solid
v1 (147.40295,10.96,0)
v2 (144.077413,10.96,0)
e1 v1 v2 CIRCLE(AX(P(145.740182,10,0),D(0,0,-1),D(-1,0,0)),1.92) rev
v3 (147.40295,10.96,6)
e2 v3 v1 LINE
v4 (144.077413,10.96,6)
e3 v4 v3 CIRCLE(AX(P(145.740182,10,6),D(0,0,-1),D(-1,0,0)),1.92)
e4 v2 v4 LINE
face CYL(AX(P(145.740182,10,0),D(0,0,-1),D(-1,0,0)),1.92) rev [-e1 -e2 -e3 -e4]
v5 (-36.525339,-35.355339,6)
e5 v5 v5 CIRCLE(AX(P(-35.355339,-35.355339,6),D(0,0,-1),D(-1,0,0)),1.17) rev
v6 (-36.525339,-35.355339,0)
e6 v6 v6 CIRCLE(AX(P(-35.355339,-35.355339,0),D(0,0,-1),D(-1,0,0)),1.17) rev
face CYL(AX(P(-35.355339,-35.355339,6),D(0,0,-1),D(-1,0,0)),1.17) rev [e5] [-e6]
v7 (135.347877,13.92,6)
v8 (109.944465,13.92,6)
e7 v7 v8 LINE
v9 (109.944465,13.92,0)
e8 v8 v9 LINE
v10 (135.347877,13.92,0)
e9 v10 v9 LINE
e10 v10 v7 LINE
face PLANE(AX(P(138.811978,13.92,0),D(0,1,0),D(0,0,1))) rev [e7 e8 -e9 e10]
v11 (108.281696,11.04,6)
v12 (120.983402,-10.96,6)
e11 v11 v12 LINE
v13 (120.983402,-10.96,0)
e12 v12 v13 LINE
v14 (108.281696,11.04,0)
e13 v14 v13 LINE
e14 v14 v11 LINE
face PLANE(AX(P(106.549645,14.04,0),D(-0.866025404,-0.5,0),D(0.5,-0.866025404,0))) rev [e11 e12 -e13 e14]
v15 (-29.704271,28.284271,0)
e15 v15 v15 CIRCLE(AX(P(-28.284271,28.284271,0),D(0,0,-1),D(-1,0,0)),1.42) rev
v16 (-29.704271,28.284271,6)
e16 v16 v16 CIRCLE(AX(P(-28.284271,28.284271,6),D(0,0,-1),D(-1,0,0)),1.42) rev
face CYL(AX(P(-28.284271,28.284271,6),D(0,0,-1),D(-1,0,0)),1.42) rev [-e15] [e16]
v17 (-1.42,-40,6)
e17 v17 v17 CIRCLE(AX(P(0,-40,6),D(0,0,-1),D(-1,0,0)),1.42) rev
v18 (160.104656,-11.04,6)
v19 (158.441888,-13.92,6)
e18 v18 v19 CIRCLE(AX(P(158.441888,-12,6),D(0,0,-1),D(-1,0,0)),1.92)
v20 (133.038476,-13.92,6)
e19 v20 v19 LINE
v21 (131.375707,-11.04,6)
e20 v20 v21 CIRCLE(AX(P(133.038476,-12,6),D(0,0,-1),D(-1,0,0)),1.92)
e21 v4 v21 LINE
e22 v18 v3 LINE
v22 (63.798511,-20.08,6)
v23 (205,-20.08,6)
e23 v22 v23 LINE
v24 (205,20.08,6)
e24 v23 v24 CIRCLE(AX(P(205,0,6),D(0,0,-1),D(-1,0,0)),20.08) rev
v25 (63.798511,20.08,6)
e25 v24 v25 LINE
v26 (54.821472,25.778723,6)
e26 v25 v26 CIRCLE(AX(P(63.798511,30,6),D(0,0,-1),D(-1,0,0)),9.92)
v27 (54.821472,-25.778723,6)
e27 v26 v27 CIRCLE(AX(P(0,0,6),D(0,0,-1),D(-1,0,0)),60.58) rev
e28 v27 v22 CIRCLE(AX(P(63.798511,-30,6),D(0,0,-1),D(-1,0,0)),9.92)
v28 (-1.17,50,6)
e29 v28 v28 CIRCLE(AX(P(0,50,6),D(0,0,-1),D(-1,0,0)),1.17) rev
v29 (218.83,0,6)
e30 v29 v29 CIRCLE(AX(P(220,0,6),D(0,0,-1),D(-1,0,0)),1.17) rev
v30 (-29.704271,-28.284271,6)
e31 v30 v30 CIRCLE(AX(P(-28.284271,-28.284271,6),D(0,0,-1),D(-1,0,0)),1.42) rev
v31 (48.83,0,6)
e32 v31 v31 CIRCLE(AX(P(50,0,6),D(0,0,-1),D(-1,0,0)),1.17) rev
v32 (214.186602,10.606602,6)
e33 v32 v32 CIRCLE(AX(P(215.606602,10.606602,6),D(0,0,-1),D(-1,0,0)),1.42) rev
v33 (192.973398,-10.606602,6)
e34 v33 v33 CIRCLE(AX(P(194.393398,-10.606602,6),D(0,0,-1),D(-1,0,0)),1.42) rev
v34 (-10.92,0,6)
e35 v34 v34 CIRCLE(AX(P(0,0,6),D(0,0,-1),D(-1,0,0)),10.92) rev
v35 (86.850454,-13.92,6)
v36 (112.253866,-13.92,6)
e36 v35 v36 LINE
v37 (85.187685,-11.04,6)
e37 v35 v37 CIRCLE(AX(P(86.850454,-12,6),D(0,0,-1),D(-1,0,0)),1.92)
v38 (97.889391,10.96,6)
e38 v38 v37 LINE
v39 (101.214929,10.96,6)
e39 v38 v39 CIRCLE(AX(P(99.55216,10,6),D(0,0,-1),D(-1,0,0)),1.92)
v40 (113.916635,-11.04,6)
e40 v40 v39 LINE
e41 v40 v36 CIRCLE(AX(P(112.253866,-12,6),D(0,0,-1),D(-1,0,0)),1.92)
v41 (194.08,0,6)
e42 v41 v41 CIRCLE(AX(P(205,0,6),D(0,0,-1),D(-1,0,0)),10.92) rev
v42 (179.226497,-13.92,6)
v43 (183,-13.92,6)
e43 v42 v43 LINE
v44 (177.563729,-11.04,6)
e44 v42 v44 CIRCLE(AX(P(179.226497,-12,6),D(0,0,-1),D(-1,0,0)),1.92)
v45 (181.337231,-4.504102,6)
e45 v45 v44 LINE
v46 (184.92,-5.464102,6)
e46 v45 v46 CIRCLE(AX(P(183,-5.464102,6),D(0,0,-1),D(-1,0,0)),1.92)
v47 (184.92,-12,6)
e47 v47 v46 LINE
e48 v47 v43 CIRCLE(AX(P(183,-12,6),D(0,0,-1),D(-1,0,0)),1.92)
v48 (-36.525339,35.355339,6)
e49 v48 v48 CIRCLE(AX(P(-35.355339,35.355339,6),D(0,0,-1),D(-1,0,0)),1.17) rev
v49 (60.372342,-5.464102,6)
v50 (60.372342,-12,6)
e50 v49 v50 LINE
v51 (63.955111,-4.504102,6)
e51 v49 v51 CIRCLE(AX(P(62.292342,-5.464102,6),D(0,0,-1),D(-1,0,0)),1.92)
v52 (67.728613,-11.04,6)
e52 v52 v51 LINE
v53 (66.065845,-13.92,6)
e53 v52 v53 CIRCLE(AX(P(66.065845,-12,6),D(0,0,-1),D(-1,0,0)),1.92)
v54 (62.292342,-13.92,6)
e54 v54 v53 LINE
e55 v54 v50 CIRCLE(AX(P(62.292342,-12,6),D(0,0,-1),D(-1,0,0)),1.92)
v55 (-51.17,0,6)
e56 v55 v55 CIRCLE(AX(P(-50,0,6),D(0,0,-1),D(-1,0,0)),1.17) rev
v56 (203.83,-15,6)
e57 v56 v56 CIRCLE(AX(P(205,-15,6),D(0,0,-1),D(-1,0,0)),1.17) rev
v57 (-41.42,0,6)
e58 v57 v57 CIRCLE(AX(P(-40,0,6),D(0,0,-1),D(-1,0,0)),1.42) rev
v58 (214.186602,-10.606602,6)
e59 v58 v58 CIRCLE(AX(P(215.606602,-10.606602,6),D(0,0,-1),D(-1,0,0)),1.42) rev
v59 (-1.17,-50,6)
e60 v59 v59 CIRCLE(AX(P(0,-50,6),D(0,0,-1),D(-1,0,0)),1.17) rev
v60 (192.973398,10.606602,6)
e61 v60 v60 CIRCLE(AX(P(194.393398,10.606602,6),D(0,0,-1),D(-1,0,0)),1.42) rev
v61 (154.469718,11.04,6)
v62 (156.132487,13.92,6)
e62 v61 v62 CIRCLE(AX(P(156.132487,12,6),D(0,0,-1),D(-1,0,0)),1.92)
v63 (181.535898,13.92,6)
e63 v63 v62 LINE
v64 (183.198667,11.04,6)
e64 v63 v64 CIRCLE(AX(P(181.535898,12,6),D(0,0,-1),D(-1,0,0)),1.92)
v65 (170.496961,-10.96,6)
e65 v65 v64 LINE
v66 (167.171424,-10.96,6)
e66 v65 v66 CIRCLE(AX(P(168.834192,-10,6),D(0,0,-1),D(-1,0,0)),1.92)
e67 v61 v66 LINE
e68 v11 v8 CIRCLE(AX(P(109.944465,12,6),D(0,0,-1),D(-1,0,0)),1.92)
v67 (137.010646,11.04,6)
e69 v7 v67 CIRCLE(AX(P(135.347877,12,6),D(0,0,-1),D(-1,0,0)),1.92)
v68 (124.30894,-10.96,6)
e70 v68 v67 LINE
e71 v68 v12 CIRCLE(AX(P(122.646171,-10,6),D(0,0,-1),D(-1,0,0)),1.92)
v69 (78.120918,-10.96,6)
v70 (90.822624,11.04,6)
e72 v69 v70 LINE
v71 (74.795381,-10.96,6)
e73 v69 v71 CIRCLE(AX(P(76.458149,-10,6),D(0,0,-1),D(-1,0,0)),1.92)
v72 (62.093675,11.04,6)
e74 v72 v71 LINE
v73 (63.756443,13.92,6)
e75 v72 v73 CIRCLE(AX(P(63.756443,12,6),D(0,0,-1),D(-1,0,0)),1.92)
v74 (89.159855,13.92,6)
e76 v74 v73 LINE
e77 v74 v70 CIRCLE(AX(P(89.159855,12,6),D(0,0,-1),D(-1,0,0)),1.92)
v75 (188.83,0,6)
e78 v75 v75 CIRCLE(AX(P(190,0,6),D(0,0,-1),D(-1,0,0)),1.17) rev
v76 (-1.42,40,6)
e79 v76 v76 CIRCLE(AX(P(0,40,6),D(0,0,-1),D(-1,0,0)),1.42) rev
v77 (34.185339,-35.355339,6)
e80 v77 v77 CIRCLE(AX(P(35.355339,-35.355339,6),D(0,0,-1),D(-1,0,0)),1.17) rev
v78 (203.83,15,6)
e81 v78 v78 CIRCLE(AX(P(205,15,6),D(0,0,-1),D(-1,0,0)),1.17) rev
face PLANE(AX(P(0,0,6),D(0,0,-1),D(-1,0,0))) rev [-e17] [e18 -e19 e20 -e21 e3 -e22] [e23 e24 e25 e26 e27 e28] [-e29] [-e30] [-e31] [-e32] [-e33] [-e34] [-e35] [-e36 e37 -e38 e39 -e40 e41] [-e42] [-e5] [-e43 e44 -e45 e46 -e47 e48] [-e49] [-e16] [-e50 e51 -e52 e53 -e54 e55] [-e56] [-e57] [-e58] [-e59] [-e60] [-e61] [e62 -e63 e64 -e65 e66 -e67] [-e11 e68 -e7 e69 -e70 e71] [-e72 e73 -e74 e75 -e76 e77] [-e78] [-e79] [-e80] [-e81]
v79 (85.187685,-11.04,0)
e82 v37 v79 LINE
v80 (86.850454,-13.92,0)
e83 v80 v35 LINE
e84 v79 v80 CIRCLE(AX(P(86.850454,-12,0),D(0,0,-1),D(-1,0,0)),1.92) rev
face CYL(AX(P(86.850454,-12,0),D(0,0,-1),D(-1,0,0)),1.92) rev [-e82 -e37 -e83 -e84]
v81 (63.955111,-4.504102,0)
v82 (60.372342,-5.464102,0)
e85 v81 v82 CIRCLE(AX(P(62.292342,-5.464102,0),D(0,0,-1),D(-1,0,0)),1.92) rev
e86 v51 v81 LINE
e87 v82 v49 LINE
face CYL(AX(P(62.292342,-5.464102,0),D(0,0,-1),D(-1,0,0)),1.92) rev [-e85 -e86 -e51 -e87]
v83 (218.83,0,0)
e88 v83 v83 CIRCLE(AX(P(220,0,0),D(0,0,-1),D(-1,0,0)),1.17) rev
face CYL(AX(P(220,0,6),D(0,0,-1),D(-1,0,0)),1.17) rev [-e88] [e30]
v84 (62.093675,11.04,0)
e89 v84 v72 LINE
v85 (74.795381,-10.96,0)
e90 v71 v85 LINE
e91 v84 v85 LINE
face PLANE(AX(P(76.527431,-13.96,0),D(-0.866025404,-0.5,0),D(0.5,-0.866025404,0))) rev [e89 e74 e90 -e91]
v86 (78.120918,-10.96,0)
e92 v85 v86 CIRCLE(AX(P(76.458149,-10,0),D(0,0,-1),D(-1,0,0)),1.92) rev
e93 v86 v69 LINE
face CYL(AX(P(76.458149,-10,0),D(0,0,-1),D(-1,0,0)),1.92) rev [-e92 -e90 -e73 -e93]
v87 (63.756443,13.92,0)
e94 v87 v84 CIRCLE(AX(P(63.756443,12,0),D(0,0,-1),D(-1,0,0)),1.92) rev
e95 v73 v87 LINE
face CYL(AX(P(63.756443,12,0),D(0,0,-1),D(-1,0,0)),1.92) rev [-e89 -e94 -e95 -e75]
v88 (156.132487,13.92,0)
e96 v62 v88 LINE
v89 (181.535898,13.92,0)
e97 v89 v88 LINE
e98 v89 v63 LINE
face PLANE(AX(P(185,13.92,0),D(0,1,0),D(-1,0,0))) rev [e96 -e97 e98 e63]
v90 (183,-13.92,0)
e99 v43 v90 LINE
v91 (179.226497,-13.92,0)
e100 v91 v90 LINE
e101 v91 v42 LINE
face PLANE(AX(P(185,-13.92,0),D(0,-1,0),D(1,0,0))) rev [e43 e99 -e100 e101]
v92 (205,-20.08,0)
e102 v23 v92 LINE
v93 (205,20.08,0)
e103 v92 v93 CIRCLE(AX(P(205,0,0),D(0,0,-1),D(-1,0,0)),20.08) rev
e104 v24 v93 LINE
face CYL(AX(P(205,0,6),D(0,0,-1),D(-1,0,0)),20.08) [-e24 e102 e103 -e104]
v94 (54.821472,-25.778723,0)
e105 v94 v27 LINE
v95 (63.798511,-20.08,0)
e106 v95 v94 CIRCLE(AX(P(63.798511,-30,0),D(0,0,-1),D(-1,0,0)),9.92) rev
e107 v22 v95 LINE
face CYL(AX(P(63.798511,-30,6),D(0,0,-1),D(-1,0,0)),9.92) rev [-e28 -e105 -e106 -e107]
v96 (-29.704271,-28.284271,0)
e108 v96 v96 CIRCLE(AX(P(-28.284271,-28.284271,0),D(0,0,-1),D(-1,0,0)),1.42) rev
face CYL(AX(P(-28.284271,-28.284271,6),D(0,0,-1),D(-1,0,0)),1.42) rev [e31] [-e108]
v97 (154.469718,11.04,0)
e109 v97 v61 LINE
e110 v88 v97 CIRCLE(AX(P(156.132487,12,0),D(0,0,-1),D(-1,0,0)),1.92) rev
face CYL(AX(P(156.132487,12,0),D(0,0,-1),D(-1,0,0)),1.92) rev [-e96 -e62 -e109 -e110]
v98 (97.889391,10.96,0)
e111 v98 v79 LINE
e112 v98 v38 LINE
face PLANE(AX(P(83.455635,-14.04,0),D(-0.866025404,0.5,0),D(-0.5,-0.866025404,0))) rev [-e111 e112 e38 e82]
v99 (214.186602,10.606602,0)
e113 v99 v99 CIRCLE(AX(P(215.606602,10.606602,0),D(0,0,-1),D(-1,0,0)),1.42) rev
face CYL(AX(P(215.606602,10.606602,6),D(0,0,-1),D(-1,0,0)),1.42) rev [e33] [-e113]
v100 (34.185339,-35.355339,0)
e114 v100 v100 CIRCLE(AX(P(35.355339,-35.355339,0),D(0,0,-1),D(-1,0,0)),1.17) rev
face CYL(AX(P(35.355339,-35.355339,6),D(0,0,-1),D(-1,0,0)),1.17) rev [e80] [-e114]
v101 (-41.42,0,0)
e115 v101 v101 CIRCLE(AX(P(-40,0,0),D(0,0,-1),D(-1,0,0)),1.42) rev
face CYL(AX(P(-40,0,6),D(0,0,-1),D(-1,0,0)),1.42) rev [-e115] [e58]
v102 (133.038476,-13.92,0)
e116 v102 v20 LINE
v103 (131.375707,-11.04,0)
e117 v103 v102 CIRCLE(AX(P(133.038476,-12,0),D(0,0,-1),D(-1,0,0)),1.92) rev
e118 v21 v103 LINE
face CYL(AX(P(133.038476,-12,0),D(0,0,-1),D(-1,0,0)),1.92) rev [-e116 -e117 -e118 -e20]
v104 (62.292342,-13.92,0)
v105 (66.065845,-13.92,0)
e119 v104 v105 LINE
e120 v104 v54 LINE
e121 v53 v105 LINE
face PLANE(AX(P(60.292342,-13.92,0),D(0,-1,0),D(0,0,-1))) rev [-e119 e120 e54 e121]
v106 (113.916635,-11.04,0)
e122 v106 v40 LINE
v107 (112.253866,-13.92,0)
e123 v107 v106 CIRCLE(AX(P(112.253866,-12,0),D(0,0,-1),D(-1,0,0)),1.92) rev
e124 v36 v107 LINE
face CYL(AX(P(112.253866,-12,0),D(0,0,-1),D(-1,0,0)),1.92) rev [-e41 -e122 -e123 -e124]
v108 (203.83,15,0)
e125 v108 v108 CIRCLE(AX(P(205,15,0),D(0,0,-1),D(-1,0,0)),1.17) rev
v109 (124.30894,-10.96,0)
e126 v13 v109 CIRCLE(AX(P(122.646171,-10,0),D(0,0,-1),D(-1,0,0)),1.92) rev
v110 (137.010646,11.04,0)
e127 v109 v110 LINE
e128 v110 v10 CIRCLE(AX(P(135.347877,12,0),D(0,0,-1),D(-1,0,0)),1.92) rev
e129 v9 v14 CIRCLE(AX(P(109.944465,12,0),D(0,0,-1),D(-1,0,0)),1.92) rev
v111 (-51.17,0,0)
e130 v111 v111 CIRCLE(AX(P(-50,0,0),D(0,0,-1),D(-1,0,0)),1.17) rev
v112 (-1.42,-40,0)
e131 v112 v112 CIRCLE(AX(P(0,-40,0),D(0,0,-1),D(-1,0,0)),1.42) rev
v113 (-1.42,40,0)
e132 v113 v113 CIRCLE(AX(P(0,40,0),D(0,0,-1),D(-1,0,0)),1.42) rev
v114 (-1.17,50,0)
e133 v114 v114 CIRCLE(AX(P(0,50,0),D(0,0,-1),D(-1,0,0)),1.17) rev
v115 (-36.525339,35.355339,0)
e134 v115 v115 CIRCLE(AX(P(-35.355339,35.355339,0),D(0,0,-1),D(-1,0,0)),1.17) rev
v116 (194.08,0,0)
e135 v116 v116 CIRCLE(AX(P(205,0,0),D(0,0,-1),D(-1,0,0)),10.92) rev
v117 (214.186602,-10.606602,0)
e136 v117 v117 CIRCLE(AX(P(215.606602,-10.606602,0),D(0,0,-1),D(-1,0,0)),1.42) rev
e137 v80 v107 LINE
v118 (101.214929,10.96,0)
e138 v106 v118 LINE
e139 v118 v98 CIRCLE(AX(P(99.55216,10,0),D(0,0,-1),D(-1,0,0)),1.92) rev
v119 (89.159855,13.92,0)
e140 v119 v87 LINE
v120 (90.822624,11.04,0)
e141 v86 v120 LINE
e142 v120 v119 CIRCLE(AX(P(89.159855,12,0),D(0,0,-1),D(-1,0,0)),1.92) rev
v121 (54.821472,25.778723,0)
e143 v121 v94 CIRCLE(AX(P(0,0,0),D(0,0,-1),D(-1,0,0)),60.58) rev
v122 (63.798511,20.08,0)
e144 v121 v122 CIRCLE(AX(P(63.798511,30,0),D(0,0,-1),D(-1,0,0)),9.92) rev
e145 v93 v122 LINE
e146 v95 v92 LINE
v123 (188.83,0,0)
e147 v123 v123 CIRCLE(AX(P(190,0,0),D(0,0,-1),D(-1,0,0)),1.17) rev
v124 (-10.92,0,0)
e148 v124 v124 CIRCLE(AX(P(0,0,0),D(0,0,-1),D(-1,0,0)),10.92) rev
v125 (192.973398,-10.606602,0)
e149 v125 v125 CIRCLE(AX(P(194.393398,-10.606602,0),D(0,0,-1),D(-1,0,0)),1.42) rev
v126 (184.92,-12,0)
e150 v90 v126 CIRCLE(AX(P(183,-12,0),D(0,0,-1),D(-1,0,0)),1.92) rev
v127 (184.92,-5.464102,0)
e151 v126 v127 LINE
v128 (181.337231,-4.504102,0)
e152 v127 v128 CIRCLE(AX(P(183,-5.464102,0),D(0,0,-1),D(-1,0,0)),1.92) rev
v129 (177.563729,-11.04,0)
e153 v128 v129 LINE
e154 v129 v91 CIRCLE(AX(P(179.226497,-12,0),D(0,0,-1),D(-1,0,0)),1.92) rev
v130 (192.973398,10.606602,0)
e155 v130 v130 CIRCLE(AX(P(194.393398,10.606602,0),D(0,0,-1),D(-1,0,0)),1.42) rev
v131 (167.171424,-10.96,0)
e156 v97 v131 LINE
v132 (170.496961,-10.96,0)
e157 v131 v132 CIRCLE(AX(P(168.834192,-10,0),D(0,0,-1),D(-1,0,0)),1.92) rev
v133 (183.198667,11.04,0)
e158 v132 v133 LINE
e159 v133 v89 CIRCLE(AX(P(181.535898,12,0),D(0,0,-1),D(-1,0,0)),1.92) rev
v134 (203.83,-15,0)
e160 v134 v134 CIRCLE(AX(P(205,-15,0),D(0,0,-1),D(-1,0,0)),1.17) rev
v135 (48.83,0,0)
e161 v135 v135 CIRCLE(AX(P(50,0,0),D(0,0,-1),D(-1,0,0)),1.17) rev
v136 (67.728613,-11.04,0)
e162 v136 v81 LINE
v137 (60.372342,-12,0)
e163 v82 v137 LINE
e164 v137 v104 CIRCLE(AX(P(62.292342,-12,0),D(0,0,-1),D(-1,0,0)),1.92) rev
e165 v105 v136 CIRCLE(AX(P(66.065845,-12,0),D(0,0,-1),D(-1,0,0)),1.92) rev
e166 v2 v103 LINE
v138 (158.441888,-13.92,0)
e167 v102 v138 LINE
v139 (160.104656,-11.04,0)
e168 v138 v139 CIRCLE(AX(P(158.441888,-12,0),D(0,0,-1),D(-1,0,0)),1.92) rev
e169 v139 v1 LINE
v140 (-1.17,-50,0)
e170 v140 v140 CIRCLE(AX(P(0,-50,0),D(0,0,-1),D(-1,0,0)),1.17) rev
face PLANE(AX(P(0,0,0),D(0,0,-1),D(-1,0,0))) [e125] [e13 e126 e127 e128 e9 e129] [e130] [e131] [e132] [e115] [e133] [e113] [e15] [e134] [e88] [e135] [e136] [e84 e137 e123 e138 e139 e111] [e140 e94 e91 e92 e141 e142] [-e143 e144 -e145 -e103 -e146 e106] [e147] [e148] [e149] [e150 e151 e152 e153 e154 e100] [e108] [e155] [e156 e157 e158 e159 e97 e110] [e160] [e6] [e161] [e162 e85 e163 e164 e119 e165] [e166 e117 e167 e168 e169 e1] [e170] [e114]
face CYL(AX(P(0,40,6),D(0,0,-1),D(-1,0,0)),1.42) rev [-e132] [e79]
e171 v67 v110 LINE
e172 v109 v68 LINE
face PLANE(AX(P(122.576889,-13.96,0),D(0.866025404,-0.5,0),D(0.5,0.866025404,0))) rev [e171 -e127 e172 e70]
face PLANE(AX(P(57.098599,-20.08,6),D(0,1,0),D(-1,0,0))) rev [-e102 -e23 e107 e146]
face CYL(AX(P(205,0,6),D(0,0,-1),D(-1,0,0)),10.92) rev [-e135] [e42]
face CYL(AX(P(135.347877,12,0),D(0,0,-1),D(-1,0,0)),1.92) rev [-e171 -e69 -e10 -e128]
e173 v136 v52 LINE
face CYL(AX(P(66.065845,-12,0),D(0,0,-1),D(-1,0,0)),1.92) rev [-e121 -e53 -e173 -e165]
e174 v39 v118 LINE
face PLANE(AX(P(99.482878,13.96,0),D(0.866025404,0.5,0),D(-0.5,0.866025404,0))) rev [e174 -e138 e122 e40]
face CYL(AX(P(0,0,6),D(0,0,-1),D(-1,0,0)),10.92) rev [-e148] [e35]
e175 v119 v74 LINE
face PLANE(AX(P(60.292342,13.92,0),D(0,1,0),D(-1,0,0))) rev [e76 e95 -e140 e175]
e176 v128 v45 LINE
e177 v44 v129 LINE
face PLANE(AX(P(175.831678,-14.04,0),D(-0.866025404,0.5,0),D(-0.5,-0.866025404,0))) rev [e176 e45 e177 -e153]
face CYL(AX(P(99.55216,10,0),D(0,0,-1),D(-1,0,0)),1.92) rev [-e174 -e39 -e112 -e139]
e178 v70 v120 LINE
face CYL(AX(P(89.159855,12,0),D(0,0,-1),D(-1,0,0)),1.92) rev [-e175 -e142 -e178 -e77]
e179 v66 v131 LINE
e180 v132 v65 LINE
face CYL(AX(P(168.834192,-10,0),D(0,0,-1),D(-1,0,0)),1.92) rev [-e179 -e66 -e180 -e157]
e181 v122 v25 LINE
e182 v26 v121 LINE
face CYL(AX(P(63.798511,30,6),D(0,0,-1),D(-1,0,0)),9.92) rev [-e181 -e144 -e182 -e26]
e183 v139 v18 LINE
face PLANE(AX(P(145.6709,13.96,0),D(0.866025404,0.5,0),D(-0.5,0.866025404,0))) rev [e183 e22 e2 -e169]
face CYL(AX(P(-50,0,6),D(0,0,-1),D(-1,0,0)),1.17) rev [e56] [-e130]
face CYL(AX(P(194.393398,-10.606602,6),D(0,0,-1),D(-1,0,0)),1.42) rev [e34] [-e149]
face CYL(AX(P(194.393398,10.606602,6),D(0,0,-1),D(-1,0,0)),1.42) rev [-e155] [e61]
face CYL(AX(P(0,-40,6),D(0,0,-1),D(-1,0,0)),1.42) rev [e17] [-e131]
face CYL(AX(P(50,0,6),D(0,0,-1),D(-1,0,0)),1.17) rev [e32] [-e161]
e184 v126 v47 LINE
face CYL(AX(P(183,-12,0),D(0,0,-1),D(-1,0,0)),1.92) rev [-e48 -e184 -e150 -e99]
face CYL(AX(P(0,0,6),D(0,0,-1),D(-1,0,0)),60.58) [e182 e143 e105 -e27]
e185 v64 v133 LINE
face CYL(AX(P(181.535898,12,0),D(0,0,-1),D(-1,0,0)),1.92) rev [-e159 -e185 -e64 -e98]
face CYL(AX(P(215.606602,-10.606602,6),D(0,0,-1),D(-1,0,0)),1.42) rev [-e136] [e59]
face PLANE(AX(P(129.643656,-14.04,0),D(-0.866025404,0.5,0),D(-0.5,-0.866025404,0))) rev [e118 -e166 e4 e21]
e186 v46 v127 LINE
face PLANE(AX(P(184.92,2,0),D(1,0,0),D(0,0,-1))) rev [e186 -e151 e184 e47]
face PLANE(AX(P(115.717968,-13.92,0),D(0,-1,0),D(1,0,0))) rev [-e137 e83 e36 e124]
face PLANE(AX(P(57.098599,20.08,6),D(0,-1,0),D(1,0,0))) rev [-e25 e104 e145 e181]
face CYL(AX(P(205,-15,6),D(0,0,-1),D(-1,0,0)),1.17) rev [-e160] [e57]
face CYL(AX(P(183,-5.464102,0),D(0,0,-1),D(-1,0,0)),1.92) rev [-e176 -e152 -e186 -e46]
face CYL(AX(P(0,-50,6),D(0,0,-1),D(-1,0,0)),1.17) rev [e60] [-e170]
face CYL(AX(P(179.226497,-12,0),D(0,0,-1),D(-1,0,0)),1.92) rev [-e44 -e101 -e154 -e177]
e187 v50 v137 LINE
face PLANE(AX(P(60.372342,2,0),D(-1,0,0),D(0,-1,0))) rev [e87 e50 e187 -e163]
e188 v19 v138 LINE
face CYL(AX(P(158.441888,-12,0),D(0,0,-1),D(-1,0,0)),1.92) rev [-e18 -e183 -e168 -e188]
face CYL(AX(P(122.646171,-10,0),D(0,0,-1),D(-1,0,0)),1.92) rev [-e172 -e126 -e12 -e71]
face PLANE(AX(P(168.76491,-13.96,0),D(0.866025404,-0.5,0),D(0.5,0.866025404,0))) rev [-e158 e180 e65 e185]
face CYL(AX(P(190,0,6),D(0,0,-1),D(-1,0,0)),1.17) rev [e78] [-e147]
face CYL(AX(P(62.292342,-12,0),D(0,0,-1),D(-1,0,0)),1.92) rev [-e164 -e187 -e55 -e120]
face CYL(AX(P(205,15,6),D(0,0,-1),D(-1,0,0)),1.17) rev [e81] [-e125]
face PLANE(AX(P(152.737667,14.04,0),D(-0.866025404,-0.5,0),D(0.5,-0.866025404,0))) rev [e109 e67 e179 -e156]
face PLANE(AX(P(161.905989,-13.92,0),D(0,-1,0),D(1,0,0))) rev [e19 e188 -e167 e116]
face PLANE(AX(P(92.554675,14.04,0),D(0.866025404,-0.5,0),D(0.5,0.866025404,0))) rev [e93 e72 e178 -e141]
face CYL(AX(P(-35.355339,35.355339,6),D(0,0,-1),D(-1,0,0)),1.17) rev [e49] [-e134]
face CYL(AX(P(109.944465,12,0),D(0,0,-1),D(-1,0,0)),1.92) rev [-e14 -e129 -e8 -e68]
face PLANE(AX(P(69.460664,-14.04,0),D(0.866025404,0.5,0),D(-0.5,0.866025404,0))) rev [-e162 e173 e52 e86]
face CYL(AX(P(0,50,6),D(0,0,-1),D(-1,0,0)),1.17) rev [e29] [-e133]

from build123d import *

# Parameters (mm, degrees)
SKETCH1_R              = 11
SKETCH1_R_2            = 1.25
SKETCH1_R_3            = 1.5
BOSS_EXTRUDE1_DEPTH    = 6
FILLET1_R              = 10
CUT_EXTRUDE1_DEPTH     = 234.069195734
FILLET2_R              = 2
MOVE_FACE1_OUTLINE_R   = 11
MOVE_FACE1_OUTLINE_R_2 = 10.92
MOVE_FACE1_OUTLINE_R_3 = 1.25
MOVE_FACE1_OUTLINE_R_4 = 1.17
MOVE_FACE1_OUTLINE_R_5 = 1.5
MOVE_FACE1_OUTLINE_R_6 = 1.42
MOVE_FACE1_DEPTH       = 6


# Read off the part's stored shape, not the designer's step: Move Face1
with BuildPart() as part:
    # Sketch1 → Boss-Extrude1 (new body)
    with BuildSketch(Plane.XY):
        with BuildLine():
            Line((57.098598932, -20), (205, -20))
            ThreePointArc((205, -20), (225, 0), (205, 20))
            Line((205, 20), (57.098598932, 20))
            ThreePointArc((57.098598932, 20), (-60.5, 0), (57.098598932, -20))
        make_face()
        Circle(SKETCH1_R, mode=Mode.SUBTRACT)
        with Locations((205, 0)):
            Circle(SKETCH1_R, mode=Mode.SUBTRACT)
        with Locations((205, -15)):
            Circle(SKETCH1_R_2, mode=Mode.SUBTRACT)
        with Locations((215.606601718, -10.606601718)):
            Circle(SKETCH1_R_3, mode=Mode.SUBTRACT)
        with Locations((190, 0)):
            Circle(SKETCH1_R_2, mode=Mode.SUBTRACT)
        with Locations((194.393398282, -10.606601718)):
            Circle(SKETCH1_R_3, mode=Mode.SUBTRACT)
        with Locations((205, 15)):
            Circle(SKETCH1_R_2, mode=Mode.SUBTRACT)
        with Locations((194.393398282, 10.606601718)):
            Circle(SKETCH1_R_3, mode=Mode.SUBTRACT)
        with Locations((220, 0)):
            Circle(SKETCH1_R_2, mode=Mode.SUBTRACT)
        with Locations((215.606601718, 10.606601718)):
            Circle(SKETCH1_R_3, mode=Mode.SUBTRACT)
        with Locations((0, -40)):
            Circle(SKETCH1_R_3, mode=Mode.SUBTRACT)
        with Locations((0, -50)):
            Circle(SKETCH1_R_2, mode=Mode.SUBTRACT)
        with Locations((-28.284271247, -28.284271247)):
            Circle(SKETCH1_R_3, mode=Mode.SUBTRACT)
        with Locations((-35.355339059, -35.355339059)):
            Circle(SKETCH1_R_2, mode=Mode.SUBTRACT)
        with Locations((-40, 0)):
            Circle(SKETCH1_R_3, mode=Mode.SUBTRACT)
        with Locations((-50, 0)):
            Circle(SKETCH1_R_2, mode=Mode.SUBTRACT)
        with Locations((-28.284271247, 28.284271247)):
            Circle(SKETCH1_R_3, mode=Mode.SUBTRACT)
        with Locations((-35.355339059, 35.355339059)):
            Circle(SKETCH1_R_2, mode=Mode.SUBTRACT)
        with Locations((0, 40)):
            Circle(SKETCH1_R_3, mode=Mode.SUBTRACT)
        with Locations((0, 50)):
            Circle(SKETCH1_R_2, mode=Mode.SUBTRACT)
        with Locations((50, 0)):
            Circle(SKETCH1_R_2, mode=Mode.SUBTRACT)
        with Locations((35.355339059, -35.355339059)):
            Circle(SKETCH1_R_2, mode=Mode.SUBTRACT)
    extrude(amount=BOSS_EXTRUDE1_DEPTH)

    # Fillet1
    fillet1_edges = [part.edges().sort_by_distance(p)[0] for p in [
        (57.098598932, 20, 3),
        (57.098598932, -20, 3),
    ]]
    fillet(fillet1_edges, radius=FILLET1_R)

    # Sketch2 → Cut-Extrude1 (cut, through all)
    with BuildSketch(Plane.XY.offset(6)):
        Polygon((60.292341855, 14), (92.62395693, 14), (76.458149392, -14), align=None)
        Polygon((83.386352623, -14), (99.55216016, 14), (115.717967697, -14), align=None)
        Polygon((106.48036339, 14), (122.646170928, -14), (138.811978465, 14), align=None)
        Polygon((129.574374158, -14), (145.740181695, 14), (161.905989232, -14), align=None)
        Polygon((152.668384925, 14), (168.834192463, -14), (185, 14), align=None)
        Polygon((60.292341855, 2), (60.292341855, -14), (69.529946162, -14), align=None)
        Polygon((185, 2), (185, -14), (175.762395693, -14), align=None)
    extrude(amount=-CUT_EXTRUDE1_DEPTH, mode=Mode.SUBTRACT)

    # Fillet2
    fillet2_edges = [part.edges().sort_by_distance(p)[0] for p in [
        (76.458149392, -14, 3),
        (60.292341855, 14, 3),
        (92.62395693, 14, 3),
        (115.717967697, -14, 3),
        (83.386352623, -14, 3),
        (99.55216016, 14, 3),
        (106.48036339, 14, 3),
        (138.811978465, 14, 3),
        (122.646170928, -14, 3),
        (161.905989232, -14, 3),
        (129.574374158, -14, 3),
        (145.740181695, 14, 3),
        (152.668384925, 14, 3),
        (185, 14, 3),
        (168.834192463, -14, 3),
        (60.292341855, 2, 3),
        (69.529946162, -14, 3),
        (60.292341855, -14, 3),
        (175.762395693, -14, 3),
        (185, 2, 3),
        (185, -14, 3),
    ]]
    fillet(fillet2_edges, radius=FILLET2_R)

    # Move Face1 outline → Move Face1 (add)
    # profile 1 of 30: a face of its own
    with BuildSketch(Plane.XY):
        with BuildLine():
            ThreePointArc((54.82147225, 25.778723404), (-60.58, 0), (54.82147225, -25.778723404))
            ThreePointArc((54.82147225, -25.778723404), (58.481964323, -21.624993617), (63.798510954, -20.08))
            Line((63.798510954, -20.08), (205, -20.08))
            ThreePointArc((205, -20.08), (225.08, 0), (205, 20.08))
            Line((205, 20.08), (63.798510954, 20.08))
            ThreePointArc((63.798510954, 20.08), (58.481964323, 21.624993617), (54.82147225, 25.778723404))
        make_face()
        with BuildLine():
            ThreePointArc((63.798510954, -20), (58.439088947, -21.557453243), (54.749076776, -25.744680851))
            ThreePointArc((54.749076776, -25.744680851), (-60.5, 0), (54.749076776, 25.744680851))
            ThreePointArc((54.749076776, 25.744680851), (58.439088947, 21.557453243), (63.798510954, 20))
            Line((63.798510954, 20), (205, 20))
            ThreePointArc((205, 20), (225, 0), (205, -20))
            Line((205, -20), (63.798510954, -20))
        make_face(mode=Mode.SUBTRACT)
    # profile 2 of 30: a face of its own
    with BuildSketch(Plane.XY):
        Circle(MOVE_FACE1_OUTLINE_R)
        Circle(MOVE_FACE1_OUTLINE_R_2, mode=Mode.SUBTRACT)
    # profile 3 of 30: a face of its own
    with BuildSketch(Plane.XY):
        with Locations((205, 0)):
            Circle(MOVE_FACE1_OUTLINE_R)
        with Locations((205, 0)):
            Circle(MOVE_FACE1_OUTLINE_R_2, mode=Mode.SUBTRACT)
    # profile 4 of 30: a face of its own
    with BuildSketch(Plane.XY):
        with Locations((205, -15)):
            Circle(MOVE_FACE1_OUTLINE_R_3)
        with Locations((205, -15)):
            Circle(MOVE_FACE1_OUTLINE_R_4, mode=Mode.SUBTRACT)
    # profile 5 of 30: a face of its own
    with BuildSketch(Plane.XY):
        with Locations((215.606601718, -10.606601718)):
            Circle(MOVE_FACE1_OUTLINE_R_5)
        with Locations((215.606601718, -10.606601718)):
            Circle(MOVE_FACE1_OUTLINE_R_6, mode=Mode.SUBTRACT)
    # profile 6 of 30: a face of its own
    with BuildSketch(Plane.XY):
        with Locations((190, 0)):
            Circle(MOVE_FACE1_OUTLINE_R_3)
        with Locations((190, 0)):
            Circle(MOVE_FACE1_OUTLINE_R_4, mode=Mode.SUBTRACT)
    # profile 7 of 30: a face of its own
    with BuildSketch(Plane.XY):
        with Locations((194.393398282, -10.606601718)):
            Circle(MOVE_FACE1_OUTLINE_R_5)
        with Locations((194.393398282, -10.606601718)):
            Circle(MOVE_FACE1_OUTLINE_R_6, mode=Mode.SUBTRACT)
    # profile 8 of 30: a face of its own
    with BuildSketch(Plane.XY):
        with Locations((205, 15)):
            Circle(MOVE_FACE1_OUTLINE_R_3)
        with Locations((205, 15)):
            Circle(MOVE_FACE1_OUTLINE_R_4, mode=Mode.SUBTRACT)
    # profile 9 of 30: a face of its own
    with BuildSketch(Plane.XY):
        with Locations((194.393398282, 10.606601718)):
            Circle(MOVE_FACE1_OUTLINE_R_5)
        with Locations((194.393398282, 10.606601718)):
            Circle(MOVE_FACE1_OUTLINE_R_6, mode=Mode.SUBTRACT)
    # profile 10 of 30: a face of its own
    with BuildSketch(Plane.XY):
        with Locations((220, 0)):
            Circle(MOVE_FACE1_OUTLINE_R_3)
        with Locations((220, 0)):
            Circle(MOVE_FACE1_OUTLINE_R_4, mode=Mode.SUBTRACT)
    # profile 11 of 30: a face of its own
    with BuildSketch(Plane.XY):
        with Locations((215.606601718, 10.606601718)):
            Circle(MOVE_FACE1_OUTLINE_R_5)
        with Locations((215.606601718, 10.606601718)):
            Circle(MOVE_FACE1_OUTLINE_R_6, mode=Mode.SUBTRACT)
    # profile 12 of 30: a face of its own
    with BuildSketch(Plane.XY):
        with Locations((0, -40)):
            Circle(MOVE_FACE1_OUTLINE_R_5)
        with Locations((0, -40)):
            Circle(MOVE_FACE1_OUTLINE_R_6, mode=Mode.SUBTRACT)
    # profile 13 of 30: a face of its own
    with BuildSketch(Plane.XY):
        with Locations((0, -50)):
            Circle(MOVE_FACE1_OUTLINE_R_3)
        with Locations((0, -50)):
            Circle(MOVE_FACE1_OUTLINE_R_4, mode=Mode.SUBTRACT)
    # profile 14 of 30: a face of its own
    with BuildSketch(Plane.XY):
        with Locations((-28.284271247, -28.284271247)):
            Circle(MOVE_FACE1_OUTLINE_R_5)
        with Locations((-28.284271247, -28.284271247)):
            Circle(MOVE_FACE1_OUTLINE_R_6, mode=Mode.SUBTRACT)
    # profile 15 of 30: a face of its own
    with BuildSketch(Plane.XY):
        with Locations((-35.355339059, -35.355339059)):
            Circle(MOVE_FACE1_OUTLINE_R_3)
        with Locations((-35.355339059, -35.355339059)):
            Circle(MOVE_FACE1_OUTLINE_R_4, mode=Mode.SUBTRACT)
    # profile 16 of 30: a face of its own
    with BuildSketch(Plane.XY):
        with Locations((-40, 0)):
            Circle(MOVE_FACE1_OUTLINE_R_5)
        with Locations((-40, 0)):
            Circle(MOVE_FACE1_OUTLINE_R_6, mode=Mode.SUBTRACT)
    # profile 17 of 30: a face of its own
    with BuildSketch(Plane.XY):
        with Locations((-50, 0)):
            Circle(MOVE_FACE1_OUTLINE_R_3)
        with Locations((-50, 0)):
            Circle(MOVE_FACE1_OUTLINE_R_4, mode=Mode.SUBTRACT)
    # profile 18 of 30: a face of its own
    with BuildSketch(Plane.XY):
        with Locations((-28.284271247, 28.284271247)):
            Circle(MOVE_FACE1_OUTLINE_R_5)
        with Locations((-28.284271247, 28.284271247)):
            Circle(MOVE_FACE1_OUTLINE_R_6, mode=Mode.SUBTRACT)
    # profile 19 of 30: a face of its own
    with BuildSketch(Plane.XY):
        with Locations((-35.355339059, 35.355339059)):
            Circle(MOVE_FACE1_OUTLINE_R_3)
        with Locations((-35.355339059, 35.355339059)):
            Circle(MOVE_FACE1_OUTLINE_R_4, mode=Mode.SUBTRACT)
    # profile 20 of 30: a face of its own
    with BuildSketch(Plane.XY):
        with Locations((0, 40)):
            Circle(MOVE_FACE1_OUTLINE_R_5)
        with Locations((0, 40)):
            Circle(MOVE_FACE1_OUTLINE_R_6, mode=Mode.SUBTRACT)
    # profile 21 of 30: a face of its own
    with BuildSketch(Plane.XY):
        with Locations((0, 50)):
            Circle(MOVE_FACE1_OUTLINE_R_3)
        with Locations((0, 50)):
            Circle(MOVE_FACE1_OUTLINE_R_4, mode=Mode.SUBTRACT)
    # profile 22 of 30: a face of its own
    with BuildSketch(Plane.XY):
        with Locations((50, 0)):
            Circle(MOVE_FACE1_OUTLINE_R_3)
        with Locations((50, 0)):
            Circle(MOVE_FACE1_OUTLINE_R_4, mode=Mode.SUBTRACT)
    # profile 23 of 30: a face of its own
    with BuildSketch(Plane.XY):
        with Locations((35.355339059, -35.355339059)):
            Circle(MOVE_FACE1_OUTLINE_R_3)
        with Locations((35.355339059, -35.355339059)):
            Circle(MOVE_FACE1_OUTLINE_R_4, mode=Mode.SUBTRACT)
    # profile 24 of 30: a face of its own
    with BuildSketch(Plane.XY):
        with BuildLine():
            ThreePointArc((63.75644347, 14), (62.024392663, 13), (62.024392663, 11))
            Line((62.024392663, 11), (74.726098585, -11))
            ThreePointArc((74.726098585, -11), (76.458149392, -12), (78.1902002, -11))
            Line((78.1902002, -11), (90.891906122, 11))
            ThreePointArc((90.891906122, 11), (90.891906122, 13), (89.159855315, 14))
            Line((89.159855315, 14), (63.75644347, 14))
        make_face()
        with BuildLine():
            Line((74.795380617, -10.96), (62.093674695, 11.04))
            ThreePointArc((62.093674695, 11.04), (62.093674695, 12.96), (63.75644347, 13.92))
            Line((63.75644347, 13.92), (89.159855315, 13.92))
            ThreePointArc((89.159855315, 13.92), (90.82262409, 12.96), (90.82262409, 11.04))
            Line((90.82262409, 11.04), (78.120918168, -10.96))
            ThreePointArc((78.120918168, -10.96), (76.458149393, -11.92), (74.795380617, -10.96))
        make_face(mode=Mode.SUBTRACT)
    # profile 25 of 30: a face of its own
    with BuildSketch(Plane.XY):
        with BuildLine():
            ThreePointArc((137.079927657, 11), (137.079927657, 13), (135.34787685, 14))
            Line((135.34787685, 14), (109.944465005, 14))
            ThreePointArc((109.944465005, 14), (108.212414198, 13), (108.212414198, 11))
            Line((108.212414198, 11), (120.91412012, -11))
            ThreePointArc((120.91412012, -11), (122.646170928, -12), (124.378221735, -11))
            Line((124.378221735, -11), (137.079927657, 11))
        make_face()
        with BuildLine():
            Line((109.944465005, 13.92), (135.34787685, 13.92))
            ThreePointArc((135.34787685, 13.92), (137.010645625, 12.96), (137.010645625, 11.04))
            Line((137.010645625, 11.04), (124.308939703, -10.96))
            ThreePointArc((124.308939703, -10.96), (122.646170927, -11.92), (120.983402152, -10.96))
            Line((120.983402152, -10.96), (108.28169623, 11.04))
            ThreePointArc((108.28169623, 11.04), (108.28169623, 12.96), (109.944465005, 13.92))
        make_face(mode=Mode.SUBTRACT)
    # profile 26 of 30: a face of its own
    with BuildSketch(Plane.XY):
        with BuildLine():
            ThreePointArc((183.267949192, 11), (183.267949192, 13), (181.535898385, 14))
            Line((181.535898385, 14), (156.132486541, 14))
            ThreePointArc((156.132486541, 14), (154.400435733, 13), (154.400435733, 11))
            Line((154.400435733, 11), (167.102141655, -11))
            ThreePointArc((167.102141655, -11), (168.834192462, -12), (170.56624327, -11))
            Line((170.56624327, -11), (183.267949192, 11))
        make_face()
        with BuildLine():
            Line((156.132486541, 13.92), (181.535898385, 13.92))
            ThreePointArc((181.535898385, 13.92), (183.19866716, 12.96), (183.19866716, 11.04))
            Line((183.19866716, 11.04), (170.496961238, -10.96))
            ThreePointArc((170.496961238, -10.96), (168.834192462, -11.92), (167.171423687, -10.96))
            Line((167.171423687, -10.96), (154.469717765, 11.04))
            ThreePointArc((154.469717765, 11.04), (154.469717765, 12.96), (156.132486541, 13.92))
        make_face(mode=Mode.SUBTRACT)
    # profile 27 of 30: a face of its own
    with BuildSketch(Plane.XY):
        with BuildLine():
            ThreePointArc((85.11840343, -11), (85.11840343, -13), (86.850454238, -14))
            Line((86.850454238, -14), (112.253866082, -14))
            ThreePointArc((112.253866082, -14), (113.98591689, -13), (113.98591689, -11))
            Line((113.98591689, -11), (101.284210968, 11))
            ThreePointArc((101.284210968, 11), (99.55216016, 12), (97.820109352, 11))
            Line((97.820109352, 11), (85.11840343, -11))
        make_face()
        with BuildLine():
            Line((112.253866082, -13.92), (86.850454238, -13.92))
            ThreePointArc((86.850454238, -13.92), (85.187685462, -12.96), (85.187685462, -11.04))
            Line((85.187685462, -11.04), (97.889391385, 10.96))
            ThreePointArc((97.889391385, 10.96), (99.55216016, 11.92), (101.214928935, 10.96))
            Line((101.214928935, 10.96), (113.916634857, -11.04))
            ThreePointArc((113.916634857, -11.04), (113.916634857, -12.96), (112.253866082, -13.92))
        make_face(mode=Mode.SUBTRACT)
    # profile 28 of 30: a face of its own
    with BuildSketch(Plane.XY):
        with BuildLine():
            ThreePointArc((131.306424965, -11), (131.306424965, -13), (133.038475773, -14))
            Line((133.038475773, -14), (158.441887617, -14))
            ThreePointArc((158.441887617, -14), (160.173938425, -13), (160.173938425, -11))
            Line((160.173938425, -11), (147.472232503, 11))
            ThreePointArc((147.472232503, 11), (145.740181696, 12), (144.008130888, 11))
            Line((144.008130888, 11), (131.306424965, -11))
        make_face()
        with BuildLine():
            Line((158.441887617, -13.92), (133.038475773, -13.92))
            ThreePointArc((133.038475773, -13.92), (131.375706998, -12.96), (131.375706998, -11.04))
            Line((131.375706998, -11.04), (144.07741292, 10.96))
            ThreePointArc((144.07741292, 10.96), (145.740181695, 11.92), (147.40295047, 10.96))
            Line((147.40295047, 10.96), (160.104656393, -11.04))
            ThreePointArc((160.104656393, -11.04), (160.104656393, -12.96), (158.441887617, -13.92))
        make_face(mode=Mode.SUBTRACT)
    # profile 29 of 30: a face of its own
    with BuildSketch(Plane.XY):
        with BuildLine():
            ThreePointArc((60.292341855, -12), (60.878128293, -13.414213562), (62.292341855, -14))
            Line((62.292341855, -14), (66.065844547, -14))
            ThreePointArc((66.065844547, -14), (67.797895355, -13), (67.797895355, -11))
            Line((67.797895355, -11), (64.024392663, -4.464101615))
            ThreePointArc((64.024392663, -4.464101615), (61.774703765, -3.532249963), (60.292341855, -5.464101615))
            Line((60.292341855, -5.464101615), (60.292341855, -12))
        make_face()
        with BuildLine():
            Line((66.065844547, -13.92), (62.292341855, -13.92))
            ThreePointArc((62.292341855, -13.92), (60.934696835, -13.35764502), (60.372341855, -12))
            Line((60.372341855, -12), (60.372341855, -5.464101615))
            ThreePointArc((60.372341855, -5.464101615), (61.795409288, -3.609524029), (63.95511063, -4.504101615))
            Line((63.95511063, -4.504101615), (67.728613322, -11.04))
            ThreePointArc((67.728613322, -11.04), (67.728613322, -12.96), (66.065844547, -13.92))
        make_face(mode=Mode.SUBTRACT)
    # profile 30 of 30: a face of its own
    with BuildSketch(Plane.XY):
        with BuildLine():
            ThreePointArc((177.494446501, -11), (177.494446501, -13), (179.226497308, -14))
            Line((179.226497308, -14), (183, -14))
            ThreePointArc((183, -14), (184.414213562, -13.414213562), (185, -12))
            Line((185, -12), (185, -5.464101615))
            ThreePointArc((185, -5.464101615), (183.51763809, -3.532249963), (181.267949192, -4.464101615))
            Line((181.267949192, -4.464101615), (177.494446501, -11))
        make_face()
        with BuildLine():
            Line((183, -13.92), (179.226497308, -13.92))
            ThreePointArc((179.226497308, -13.92), (177.563728533, -12.96), (177.563728533, -11.04))
            Line((177.563728533, -11.04), (181.337231225, -4.504101615))
            ThreePointArc((181.337231225, -4.504101615), (183.496932567, -3.609524029), (184.92, -5.464101615))
            Line((184.92, -5.464101615), (184.92, -12))
            ThreePointArc((184.92, -12), (184.35764502, -13.35764502), (183, -13.92))
        make_face(mode=Mode.SUBTRACT)
    extrude(amount=MOVE_FACE1_DEPTH)


solid = part.part
